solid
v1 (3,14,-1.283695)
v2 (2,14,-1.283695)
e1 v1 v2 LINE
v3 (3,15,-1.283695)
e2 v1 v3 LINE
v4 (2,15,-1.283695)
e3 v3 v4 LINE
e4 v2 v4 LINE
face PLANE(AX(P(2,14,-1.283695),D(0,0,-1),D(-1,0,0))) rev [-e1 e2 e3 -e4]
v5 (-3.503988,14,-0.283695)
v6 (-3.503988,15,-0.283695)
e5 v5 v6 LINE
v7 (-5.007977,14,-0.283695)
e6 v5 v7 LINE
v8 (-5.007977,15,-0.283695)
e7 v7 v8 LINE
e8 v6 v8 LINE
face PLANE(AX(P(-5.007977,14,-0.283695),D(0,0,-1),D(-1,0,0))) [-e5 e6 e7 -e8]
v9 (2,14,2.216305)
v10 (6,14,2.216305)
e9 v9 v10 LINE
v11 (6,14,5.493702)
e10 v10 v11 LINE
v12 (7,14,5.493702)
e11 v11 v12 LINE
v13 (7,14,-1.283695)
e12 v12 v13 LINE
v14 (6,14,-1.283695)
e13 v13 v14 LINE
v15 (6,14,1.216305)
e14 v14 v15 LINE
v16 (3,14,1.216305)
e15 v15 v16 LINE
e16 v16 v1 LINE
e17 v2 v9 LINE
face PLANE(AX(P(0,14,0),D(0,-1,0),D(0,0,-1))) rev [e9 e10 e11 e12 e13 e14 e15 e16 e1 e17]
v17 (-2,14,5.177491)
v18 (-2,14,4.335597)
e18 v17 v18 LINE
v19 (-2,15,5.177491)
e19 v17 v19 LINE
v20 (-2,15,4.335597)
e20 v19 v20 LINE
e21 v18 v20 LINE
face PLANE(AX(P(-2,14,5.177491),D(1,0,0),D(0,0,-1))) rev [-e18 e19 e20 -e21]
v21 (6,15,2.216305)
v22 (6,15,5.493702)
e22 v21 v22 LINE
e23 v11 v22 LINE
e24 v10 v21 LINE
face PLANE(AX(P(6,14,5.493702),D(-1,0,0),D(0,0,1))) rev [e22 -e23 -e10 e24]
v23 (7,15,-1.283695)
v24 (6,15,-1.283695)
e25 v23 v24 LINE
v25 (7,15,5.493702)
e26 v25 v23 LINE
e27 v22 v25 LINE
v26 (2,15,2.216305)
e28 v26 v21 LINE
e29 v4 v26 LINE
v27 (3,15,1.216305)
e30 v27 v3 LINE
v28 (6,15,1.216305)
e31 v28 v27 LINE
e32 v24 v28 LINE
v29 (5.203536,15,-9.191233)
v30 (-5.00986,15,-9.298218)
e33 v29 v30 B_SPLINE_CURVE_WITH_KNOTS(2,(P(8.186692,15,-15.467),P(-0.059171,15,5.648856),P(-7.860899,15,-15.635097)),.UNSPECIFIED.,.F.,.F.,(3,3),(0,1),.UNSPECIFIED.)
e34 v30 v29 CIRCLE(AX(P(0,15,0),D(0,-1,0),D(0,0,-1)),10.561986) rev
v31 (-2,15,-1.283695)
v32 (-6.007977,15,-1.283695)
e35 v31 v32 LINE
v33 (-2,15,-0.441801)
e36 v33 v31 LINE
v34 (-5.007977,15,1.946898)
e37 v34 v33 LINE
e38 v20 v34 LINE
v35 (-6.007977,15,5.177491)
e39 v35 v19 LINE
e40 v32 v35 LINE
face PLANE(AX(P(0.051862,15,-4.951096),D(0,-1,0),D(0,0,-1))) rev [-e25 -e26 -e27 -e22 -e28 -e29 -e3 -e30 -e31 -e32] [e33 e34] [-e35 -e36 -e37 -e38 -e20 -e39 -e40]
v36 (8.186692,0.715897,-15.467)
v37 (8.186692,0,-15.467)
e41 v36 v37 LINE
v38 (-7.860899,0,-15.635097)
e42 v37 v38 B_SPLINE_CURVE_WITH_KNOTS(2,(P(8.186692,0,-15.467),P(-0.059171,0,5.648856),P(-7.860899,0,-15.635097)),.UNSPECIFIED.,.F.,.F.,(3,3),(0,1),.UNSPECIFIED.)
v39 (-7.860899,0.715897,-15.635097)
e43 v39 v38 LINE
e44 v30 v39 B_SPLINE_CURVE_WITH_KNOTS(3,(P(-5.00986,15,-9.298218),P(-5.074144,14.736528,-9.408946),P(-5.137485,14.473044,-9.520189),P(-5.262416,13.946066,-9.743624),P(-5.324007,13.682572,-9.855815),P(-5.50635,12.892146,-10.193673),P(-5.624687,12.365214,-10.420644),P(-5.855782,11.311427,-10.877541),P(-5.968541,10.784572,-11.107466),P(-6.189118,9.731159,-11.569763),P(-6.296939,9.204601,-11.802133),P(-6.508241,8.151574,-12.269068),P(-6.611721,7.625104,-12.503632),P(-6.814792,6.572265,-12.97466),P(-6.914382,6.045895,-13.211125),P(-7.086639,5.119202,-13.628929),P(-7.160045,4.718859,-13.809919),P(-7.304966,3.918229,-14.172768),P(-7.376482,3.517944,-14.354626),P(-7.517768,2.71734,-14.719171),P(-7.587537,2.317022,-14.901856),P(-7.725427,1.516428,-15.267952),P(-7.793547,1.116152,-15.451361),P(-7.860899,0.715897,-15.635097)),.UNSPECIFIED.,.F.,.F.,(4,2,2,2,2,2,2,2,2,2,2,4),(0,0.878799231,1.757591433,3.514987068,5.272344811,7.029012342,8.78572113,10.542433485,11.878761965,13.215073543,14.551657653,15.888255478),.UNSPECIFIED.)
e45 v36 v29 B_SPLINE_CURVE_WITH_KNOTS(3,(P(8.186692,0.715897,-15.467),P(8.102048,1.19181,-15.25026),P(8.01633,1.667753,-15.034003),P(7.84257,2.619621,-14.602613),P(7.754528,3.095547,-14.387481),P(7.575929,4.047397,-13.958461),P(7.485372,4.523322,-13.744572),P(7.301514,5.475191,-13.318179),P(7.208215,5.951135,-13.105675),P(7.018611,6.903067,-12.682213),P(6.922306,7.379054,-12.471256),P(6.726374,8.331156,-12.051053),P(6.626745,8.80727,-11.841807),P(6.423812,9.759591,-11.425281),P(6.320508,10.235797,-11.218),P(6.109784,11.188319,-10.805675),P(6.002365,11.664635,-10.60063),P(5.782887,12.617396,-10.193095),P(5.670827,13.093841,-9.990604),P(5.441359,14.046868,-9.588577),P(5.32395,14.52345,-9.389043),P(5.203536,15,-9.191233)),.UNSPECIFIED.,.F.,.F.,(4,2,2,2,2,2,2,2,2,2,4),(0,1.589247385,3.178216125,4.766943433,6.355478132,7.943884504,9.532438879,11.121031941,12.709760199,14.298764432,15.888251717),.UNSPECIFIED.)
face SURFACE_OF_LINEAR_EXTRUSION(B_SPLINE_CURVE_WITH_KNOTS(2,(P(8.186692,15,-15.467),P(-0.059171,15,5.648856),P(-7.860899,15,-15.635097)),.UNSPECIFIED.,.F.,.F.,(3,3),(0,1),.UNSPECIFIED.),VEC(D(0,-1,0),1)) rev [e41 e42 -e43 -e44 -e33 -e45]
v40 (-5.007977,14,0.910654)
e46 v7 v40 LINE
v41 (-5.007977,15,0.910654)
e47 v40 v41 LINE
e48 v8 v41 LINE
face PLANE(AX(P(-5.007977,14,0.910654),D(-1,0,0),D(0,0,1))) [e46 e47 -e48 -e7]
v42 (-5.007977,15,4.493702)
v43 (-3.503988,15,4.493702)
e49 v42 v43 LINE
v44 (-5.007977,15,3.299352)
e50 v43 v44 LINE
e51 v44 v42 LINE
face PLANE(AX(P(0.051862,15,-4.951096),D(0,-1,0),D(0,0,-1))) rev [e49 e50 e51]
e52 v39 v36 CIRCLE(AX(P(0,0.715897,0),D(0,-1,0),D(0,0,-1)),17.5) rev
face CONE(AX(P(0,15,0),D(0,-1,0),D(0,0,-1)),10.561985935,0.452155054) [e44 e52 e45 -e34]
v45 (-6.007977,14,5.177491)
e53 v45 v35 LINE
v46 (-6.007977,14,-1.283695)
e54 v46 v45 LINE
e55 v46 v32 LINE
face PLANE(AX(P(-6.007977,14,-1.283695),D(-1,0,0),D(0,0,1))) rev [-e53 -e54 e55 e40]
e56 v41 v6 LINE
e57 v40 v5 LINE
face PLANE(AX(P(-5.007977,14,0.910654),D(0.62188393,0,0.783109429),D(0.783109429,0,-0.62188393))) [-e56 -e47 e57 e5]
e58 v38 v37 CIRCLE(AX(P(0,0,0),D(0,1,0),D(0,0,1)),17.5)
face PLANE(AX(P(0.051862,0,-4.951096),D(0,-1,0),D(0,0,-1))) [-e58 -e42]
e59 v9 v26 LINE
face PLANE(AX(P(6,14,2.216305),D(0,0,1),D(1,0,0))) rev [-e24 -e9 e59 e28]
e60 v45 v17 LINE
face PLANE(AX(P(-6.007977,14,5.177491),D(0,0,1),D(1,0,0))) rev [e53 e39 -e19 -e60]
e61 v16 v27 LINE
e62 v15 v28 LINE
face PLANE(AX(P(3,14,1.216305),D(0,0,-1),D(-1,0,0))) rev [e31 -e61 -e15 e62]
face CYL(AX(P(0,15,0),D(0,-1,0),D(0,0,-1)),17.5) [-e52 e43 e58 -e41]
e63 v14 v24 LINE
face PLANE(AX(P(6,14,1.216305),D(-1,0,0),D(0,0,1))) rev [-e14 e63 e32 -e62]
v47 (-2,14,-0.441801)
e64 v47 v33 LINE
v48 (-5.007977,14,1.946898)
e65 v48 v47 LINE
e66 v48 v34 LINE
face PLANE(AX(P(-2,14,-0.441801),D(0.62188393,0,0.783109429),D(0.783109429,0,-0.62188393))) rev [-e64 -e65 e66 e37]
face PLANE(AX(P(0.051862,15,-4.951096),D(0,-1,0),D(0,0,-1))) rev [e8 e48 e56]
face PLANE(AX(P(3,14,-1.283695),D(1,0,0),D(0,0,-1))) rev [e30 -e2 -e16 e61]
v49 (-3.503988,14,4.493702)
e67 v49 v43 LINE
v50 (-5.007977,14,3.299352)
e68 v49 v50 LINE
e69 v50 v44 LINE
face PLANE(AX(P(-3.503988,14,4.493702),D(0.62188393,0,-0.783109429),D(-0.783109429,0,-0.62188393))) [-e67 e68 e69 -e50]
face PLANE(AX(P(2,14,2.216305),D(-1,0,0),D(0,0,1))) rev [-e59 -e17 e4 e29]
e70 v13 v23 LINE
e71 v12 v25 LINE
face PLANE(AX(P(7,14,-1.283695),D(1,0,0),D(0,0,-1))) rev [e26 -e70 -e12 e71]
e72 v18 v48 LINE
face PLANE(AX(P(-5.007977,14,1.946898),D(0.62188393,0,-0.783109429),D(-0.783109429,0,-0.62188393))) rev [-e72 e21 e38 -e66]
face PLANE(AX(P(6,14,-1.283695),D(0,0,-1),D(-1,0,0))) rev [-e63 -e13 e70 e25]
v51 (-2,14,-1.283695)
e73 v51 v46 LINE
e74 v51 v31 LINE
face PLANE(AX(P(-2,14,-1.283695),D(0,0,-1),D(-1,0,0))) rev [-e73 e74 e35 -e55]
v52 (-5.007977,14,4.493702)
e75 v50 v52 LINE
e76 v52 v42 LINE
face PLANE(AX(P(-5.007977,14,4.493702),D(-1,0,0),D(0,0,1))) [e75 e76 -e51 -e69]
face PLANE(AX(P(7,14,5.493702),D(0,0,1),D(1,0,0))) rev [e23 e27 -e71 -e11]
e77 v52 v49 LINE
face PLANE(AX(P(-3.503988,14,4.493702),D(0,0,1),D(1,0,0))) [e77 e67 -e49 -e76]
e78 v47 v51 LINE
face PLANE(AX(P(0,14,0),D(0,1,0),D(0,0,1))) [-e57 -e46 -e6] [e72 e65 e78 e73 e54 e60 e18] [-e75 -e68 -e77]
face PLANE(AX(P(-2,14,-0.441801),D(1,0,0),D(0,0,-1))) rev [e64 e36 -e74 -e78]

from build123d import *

# Parameters (mm, degrees)
BOSS_EXTRUDE2_DEPTH = 15
CUT_EXTRUDE1_DEPTH  = 1


# Read off the part's stored shape, not the designer's step: Cut-Revolve-Thin2
with BuildPart() as part:
    # Sketch2 → Boss-Extrude2 (new body)
    with BuildSketch(Plane(origin=(0, 0, 0), x_dir=(1, 0, 0), z_dir=(0, 1, 0))):
        with BuildLine():
            ThreePointArc((-7.860899149, 15.635097204), (-0.183301368, -17.499039991), (8.1866917, 15.466999677))
            add(Edge.make_bspline(
                [(-7.860899149, 15.635097204), (-0.059171416, -5.64885573), (8.1866917, 15.466999677)],
                knots=[0, 0, 0, 1, 1, 1], degree=2))
        make_face()
    extrude(amount=BOSS_EXTRUDE2_DEPTH)

    # Cut-Revolve-Thin2 outline → Cut-Revolve-Thin2 (revolve, cut)
    with BuildSketch(Plane.XY):
        Polygon((17.5, 15), (10.561985935, 15), (17.5, 0.715896694), align=None)
    revolve(axis=Axis((0, 0, 0), (0, 1, 0)), mode=Mode.SUBTRACT)

    # Sketch8 → Cut-Extrude1 (cut)
    # profile 1 of 2: a face of its own
    with BuildSketch(Plane(origin=(0, 15, 0), x_dir=(1, 0, 0), z_dir=(0, 1, 0))):
        Polygon((-6.00797666, 1.283695301), (-6.00797666, -5.177491307), (-2, -5.177491307), (-2, -4.335596537), (-5.00797666, -1.946898003), (-2, 0.441800531), (-2, 1.283695301), align=None)
        Polygon((-3.50398833, -4.493701766), (-5.00797666, -4.493701766), (-5.00797666, -3.2993525), align=None, mode=Mode.SUBTRACT)
        Polygon((-5.00797666, 0.283695301), (-3.50398833, 0.283695301), (-5.00797666, -0.910653966), align=None, mode=Mode.SUBTRACT)
    # profile 2 of 2: a face of its own
    with BuildSketch(Plane(origin=(0, 15, 0), x_dir=(1, 0, 0), z_dir=(0, 1, 0))):
        Polygon((2, 1.283695301), (3, 1.283695301), (3, -1.216304699), (6, -1.216304699), (6, 1.283695301), (7, 1.283695301), (7, -5.493701766), (6, -5.493701766), (6, -2.216304699), (2, -2.216304699), align=None)
    extrude(amount=-CUT_EXTRUDE1_DEPTH, mode=Mode.SUBTRACT)


solid = part.part
